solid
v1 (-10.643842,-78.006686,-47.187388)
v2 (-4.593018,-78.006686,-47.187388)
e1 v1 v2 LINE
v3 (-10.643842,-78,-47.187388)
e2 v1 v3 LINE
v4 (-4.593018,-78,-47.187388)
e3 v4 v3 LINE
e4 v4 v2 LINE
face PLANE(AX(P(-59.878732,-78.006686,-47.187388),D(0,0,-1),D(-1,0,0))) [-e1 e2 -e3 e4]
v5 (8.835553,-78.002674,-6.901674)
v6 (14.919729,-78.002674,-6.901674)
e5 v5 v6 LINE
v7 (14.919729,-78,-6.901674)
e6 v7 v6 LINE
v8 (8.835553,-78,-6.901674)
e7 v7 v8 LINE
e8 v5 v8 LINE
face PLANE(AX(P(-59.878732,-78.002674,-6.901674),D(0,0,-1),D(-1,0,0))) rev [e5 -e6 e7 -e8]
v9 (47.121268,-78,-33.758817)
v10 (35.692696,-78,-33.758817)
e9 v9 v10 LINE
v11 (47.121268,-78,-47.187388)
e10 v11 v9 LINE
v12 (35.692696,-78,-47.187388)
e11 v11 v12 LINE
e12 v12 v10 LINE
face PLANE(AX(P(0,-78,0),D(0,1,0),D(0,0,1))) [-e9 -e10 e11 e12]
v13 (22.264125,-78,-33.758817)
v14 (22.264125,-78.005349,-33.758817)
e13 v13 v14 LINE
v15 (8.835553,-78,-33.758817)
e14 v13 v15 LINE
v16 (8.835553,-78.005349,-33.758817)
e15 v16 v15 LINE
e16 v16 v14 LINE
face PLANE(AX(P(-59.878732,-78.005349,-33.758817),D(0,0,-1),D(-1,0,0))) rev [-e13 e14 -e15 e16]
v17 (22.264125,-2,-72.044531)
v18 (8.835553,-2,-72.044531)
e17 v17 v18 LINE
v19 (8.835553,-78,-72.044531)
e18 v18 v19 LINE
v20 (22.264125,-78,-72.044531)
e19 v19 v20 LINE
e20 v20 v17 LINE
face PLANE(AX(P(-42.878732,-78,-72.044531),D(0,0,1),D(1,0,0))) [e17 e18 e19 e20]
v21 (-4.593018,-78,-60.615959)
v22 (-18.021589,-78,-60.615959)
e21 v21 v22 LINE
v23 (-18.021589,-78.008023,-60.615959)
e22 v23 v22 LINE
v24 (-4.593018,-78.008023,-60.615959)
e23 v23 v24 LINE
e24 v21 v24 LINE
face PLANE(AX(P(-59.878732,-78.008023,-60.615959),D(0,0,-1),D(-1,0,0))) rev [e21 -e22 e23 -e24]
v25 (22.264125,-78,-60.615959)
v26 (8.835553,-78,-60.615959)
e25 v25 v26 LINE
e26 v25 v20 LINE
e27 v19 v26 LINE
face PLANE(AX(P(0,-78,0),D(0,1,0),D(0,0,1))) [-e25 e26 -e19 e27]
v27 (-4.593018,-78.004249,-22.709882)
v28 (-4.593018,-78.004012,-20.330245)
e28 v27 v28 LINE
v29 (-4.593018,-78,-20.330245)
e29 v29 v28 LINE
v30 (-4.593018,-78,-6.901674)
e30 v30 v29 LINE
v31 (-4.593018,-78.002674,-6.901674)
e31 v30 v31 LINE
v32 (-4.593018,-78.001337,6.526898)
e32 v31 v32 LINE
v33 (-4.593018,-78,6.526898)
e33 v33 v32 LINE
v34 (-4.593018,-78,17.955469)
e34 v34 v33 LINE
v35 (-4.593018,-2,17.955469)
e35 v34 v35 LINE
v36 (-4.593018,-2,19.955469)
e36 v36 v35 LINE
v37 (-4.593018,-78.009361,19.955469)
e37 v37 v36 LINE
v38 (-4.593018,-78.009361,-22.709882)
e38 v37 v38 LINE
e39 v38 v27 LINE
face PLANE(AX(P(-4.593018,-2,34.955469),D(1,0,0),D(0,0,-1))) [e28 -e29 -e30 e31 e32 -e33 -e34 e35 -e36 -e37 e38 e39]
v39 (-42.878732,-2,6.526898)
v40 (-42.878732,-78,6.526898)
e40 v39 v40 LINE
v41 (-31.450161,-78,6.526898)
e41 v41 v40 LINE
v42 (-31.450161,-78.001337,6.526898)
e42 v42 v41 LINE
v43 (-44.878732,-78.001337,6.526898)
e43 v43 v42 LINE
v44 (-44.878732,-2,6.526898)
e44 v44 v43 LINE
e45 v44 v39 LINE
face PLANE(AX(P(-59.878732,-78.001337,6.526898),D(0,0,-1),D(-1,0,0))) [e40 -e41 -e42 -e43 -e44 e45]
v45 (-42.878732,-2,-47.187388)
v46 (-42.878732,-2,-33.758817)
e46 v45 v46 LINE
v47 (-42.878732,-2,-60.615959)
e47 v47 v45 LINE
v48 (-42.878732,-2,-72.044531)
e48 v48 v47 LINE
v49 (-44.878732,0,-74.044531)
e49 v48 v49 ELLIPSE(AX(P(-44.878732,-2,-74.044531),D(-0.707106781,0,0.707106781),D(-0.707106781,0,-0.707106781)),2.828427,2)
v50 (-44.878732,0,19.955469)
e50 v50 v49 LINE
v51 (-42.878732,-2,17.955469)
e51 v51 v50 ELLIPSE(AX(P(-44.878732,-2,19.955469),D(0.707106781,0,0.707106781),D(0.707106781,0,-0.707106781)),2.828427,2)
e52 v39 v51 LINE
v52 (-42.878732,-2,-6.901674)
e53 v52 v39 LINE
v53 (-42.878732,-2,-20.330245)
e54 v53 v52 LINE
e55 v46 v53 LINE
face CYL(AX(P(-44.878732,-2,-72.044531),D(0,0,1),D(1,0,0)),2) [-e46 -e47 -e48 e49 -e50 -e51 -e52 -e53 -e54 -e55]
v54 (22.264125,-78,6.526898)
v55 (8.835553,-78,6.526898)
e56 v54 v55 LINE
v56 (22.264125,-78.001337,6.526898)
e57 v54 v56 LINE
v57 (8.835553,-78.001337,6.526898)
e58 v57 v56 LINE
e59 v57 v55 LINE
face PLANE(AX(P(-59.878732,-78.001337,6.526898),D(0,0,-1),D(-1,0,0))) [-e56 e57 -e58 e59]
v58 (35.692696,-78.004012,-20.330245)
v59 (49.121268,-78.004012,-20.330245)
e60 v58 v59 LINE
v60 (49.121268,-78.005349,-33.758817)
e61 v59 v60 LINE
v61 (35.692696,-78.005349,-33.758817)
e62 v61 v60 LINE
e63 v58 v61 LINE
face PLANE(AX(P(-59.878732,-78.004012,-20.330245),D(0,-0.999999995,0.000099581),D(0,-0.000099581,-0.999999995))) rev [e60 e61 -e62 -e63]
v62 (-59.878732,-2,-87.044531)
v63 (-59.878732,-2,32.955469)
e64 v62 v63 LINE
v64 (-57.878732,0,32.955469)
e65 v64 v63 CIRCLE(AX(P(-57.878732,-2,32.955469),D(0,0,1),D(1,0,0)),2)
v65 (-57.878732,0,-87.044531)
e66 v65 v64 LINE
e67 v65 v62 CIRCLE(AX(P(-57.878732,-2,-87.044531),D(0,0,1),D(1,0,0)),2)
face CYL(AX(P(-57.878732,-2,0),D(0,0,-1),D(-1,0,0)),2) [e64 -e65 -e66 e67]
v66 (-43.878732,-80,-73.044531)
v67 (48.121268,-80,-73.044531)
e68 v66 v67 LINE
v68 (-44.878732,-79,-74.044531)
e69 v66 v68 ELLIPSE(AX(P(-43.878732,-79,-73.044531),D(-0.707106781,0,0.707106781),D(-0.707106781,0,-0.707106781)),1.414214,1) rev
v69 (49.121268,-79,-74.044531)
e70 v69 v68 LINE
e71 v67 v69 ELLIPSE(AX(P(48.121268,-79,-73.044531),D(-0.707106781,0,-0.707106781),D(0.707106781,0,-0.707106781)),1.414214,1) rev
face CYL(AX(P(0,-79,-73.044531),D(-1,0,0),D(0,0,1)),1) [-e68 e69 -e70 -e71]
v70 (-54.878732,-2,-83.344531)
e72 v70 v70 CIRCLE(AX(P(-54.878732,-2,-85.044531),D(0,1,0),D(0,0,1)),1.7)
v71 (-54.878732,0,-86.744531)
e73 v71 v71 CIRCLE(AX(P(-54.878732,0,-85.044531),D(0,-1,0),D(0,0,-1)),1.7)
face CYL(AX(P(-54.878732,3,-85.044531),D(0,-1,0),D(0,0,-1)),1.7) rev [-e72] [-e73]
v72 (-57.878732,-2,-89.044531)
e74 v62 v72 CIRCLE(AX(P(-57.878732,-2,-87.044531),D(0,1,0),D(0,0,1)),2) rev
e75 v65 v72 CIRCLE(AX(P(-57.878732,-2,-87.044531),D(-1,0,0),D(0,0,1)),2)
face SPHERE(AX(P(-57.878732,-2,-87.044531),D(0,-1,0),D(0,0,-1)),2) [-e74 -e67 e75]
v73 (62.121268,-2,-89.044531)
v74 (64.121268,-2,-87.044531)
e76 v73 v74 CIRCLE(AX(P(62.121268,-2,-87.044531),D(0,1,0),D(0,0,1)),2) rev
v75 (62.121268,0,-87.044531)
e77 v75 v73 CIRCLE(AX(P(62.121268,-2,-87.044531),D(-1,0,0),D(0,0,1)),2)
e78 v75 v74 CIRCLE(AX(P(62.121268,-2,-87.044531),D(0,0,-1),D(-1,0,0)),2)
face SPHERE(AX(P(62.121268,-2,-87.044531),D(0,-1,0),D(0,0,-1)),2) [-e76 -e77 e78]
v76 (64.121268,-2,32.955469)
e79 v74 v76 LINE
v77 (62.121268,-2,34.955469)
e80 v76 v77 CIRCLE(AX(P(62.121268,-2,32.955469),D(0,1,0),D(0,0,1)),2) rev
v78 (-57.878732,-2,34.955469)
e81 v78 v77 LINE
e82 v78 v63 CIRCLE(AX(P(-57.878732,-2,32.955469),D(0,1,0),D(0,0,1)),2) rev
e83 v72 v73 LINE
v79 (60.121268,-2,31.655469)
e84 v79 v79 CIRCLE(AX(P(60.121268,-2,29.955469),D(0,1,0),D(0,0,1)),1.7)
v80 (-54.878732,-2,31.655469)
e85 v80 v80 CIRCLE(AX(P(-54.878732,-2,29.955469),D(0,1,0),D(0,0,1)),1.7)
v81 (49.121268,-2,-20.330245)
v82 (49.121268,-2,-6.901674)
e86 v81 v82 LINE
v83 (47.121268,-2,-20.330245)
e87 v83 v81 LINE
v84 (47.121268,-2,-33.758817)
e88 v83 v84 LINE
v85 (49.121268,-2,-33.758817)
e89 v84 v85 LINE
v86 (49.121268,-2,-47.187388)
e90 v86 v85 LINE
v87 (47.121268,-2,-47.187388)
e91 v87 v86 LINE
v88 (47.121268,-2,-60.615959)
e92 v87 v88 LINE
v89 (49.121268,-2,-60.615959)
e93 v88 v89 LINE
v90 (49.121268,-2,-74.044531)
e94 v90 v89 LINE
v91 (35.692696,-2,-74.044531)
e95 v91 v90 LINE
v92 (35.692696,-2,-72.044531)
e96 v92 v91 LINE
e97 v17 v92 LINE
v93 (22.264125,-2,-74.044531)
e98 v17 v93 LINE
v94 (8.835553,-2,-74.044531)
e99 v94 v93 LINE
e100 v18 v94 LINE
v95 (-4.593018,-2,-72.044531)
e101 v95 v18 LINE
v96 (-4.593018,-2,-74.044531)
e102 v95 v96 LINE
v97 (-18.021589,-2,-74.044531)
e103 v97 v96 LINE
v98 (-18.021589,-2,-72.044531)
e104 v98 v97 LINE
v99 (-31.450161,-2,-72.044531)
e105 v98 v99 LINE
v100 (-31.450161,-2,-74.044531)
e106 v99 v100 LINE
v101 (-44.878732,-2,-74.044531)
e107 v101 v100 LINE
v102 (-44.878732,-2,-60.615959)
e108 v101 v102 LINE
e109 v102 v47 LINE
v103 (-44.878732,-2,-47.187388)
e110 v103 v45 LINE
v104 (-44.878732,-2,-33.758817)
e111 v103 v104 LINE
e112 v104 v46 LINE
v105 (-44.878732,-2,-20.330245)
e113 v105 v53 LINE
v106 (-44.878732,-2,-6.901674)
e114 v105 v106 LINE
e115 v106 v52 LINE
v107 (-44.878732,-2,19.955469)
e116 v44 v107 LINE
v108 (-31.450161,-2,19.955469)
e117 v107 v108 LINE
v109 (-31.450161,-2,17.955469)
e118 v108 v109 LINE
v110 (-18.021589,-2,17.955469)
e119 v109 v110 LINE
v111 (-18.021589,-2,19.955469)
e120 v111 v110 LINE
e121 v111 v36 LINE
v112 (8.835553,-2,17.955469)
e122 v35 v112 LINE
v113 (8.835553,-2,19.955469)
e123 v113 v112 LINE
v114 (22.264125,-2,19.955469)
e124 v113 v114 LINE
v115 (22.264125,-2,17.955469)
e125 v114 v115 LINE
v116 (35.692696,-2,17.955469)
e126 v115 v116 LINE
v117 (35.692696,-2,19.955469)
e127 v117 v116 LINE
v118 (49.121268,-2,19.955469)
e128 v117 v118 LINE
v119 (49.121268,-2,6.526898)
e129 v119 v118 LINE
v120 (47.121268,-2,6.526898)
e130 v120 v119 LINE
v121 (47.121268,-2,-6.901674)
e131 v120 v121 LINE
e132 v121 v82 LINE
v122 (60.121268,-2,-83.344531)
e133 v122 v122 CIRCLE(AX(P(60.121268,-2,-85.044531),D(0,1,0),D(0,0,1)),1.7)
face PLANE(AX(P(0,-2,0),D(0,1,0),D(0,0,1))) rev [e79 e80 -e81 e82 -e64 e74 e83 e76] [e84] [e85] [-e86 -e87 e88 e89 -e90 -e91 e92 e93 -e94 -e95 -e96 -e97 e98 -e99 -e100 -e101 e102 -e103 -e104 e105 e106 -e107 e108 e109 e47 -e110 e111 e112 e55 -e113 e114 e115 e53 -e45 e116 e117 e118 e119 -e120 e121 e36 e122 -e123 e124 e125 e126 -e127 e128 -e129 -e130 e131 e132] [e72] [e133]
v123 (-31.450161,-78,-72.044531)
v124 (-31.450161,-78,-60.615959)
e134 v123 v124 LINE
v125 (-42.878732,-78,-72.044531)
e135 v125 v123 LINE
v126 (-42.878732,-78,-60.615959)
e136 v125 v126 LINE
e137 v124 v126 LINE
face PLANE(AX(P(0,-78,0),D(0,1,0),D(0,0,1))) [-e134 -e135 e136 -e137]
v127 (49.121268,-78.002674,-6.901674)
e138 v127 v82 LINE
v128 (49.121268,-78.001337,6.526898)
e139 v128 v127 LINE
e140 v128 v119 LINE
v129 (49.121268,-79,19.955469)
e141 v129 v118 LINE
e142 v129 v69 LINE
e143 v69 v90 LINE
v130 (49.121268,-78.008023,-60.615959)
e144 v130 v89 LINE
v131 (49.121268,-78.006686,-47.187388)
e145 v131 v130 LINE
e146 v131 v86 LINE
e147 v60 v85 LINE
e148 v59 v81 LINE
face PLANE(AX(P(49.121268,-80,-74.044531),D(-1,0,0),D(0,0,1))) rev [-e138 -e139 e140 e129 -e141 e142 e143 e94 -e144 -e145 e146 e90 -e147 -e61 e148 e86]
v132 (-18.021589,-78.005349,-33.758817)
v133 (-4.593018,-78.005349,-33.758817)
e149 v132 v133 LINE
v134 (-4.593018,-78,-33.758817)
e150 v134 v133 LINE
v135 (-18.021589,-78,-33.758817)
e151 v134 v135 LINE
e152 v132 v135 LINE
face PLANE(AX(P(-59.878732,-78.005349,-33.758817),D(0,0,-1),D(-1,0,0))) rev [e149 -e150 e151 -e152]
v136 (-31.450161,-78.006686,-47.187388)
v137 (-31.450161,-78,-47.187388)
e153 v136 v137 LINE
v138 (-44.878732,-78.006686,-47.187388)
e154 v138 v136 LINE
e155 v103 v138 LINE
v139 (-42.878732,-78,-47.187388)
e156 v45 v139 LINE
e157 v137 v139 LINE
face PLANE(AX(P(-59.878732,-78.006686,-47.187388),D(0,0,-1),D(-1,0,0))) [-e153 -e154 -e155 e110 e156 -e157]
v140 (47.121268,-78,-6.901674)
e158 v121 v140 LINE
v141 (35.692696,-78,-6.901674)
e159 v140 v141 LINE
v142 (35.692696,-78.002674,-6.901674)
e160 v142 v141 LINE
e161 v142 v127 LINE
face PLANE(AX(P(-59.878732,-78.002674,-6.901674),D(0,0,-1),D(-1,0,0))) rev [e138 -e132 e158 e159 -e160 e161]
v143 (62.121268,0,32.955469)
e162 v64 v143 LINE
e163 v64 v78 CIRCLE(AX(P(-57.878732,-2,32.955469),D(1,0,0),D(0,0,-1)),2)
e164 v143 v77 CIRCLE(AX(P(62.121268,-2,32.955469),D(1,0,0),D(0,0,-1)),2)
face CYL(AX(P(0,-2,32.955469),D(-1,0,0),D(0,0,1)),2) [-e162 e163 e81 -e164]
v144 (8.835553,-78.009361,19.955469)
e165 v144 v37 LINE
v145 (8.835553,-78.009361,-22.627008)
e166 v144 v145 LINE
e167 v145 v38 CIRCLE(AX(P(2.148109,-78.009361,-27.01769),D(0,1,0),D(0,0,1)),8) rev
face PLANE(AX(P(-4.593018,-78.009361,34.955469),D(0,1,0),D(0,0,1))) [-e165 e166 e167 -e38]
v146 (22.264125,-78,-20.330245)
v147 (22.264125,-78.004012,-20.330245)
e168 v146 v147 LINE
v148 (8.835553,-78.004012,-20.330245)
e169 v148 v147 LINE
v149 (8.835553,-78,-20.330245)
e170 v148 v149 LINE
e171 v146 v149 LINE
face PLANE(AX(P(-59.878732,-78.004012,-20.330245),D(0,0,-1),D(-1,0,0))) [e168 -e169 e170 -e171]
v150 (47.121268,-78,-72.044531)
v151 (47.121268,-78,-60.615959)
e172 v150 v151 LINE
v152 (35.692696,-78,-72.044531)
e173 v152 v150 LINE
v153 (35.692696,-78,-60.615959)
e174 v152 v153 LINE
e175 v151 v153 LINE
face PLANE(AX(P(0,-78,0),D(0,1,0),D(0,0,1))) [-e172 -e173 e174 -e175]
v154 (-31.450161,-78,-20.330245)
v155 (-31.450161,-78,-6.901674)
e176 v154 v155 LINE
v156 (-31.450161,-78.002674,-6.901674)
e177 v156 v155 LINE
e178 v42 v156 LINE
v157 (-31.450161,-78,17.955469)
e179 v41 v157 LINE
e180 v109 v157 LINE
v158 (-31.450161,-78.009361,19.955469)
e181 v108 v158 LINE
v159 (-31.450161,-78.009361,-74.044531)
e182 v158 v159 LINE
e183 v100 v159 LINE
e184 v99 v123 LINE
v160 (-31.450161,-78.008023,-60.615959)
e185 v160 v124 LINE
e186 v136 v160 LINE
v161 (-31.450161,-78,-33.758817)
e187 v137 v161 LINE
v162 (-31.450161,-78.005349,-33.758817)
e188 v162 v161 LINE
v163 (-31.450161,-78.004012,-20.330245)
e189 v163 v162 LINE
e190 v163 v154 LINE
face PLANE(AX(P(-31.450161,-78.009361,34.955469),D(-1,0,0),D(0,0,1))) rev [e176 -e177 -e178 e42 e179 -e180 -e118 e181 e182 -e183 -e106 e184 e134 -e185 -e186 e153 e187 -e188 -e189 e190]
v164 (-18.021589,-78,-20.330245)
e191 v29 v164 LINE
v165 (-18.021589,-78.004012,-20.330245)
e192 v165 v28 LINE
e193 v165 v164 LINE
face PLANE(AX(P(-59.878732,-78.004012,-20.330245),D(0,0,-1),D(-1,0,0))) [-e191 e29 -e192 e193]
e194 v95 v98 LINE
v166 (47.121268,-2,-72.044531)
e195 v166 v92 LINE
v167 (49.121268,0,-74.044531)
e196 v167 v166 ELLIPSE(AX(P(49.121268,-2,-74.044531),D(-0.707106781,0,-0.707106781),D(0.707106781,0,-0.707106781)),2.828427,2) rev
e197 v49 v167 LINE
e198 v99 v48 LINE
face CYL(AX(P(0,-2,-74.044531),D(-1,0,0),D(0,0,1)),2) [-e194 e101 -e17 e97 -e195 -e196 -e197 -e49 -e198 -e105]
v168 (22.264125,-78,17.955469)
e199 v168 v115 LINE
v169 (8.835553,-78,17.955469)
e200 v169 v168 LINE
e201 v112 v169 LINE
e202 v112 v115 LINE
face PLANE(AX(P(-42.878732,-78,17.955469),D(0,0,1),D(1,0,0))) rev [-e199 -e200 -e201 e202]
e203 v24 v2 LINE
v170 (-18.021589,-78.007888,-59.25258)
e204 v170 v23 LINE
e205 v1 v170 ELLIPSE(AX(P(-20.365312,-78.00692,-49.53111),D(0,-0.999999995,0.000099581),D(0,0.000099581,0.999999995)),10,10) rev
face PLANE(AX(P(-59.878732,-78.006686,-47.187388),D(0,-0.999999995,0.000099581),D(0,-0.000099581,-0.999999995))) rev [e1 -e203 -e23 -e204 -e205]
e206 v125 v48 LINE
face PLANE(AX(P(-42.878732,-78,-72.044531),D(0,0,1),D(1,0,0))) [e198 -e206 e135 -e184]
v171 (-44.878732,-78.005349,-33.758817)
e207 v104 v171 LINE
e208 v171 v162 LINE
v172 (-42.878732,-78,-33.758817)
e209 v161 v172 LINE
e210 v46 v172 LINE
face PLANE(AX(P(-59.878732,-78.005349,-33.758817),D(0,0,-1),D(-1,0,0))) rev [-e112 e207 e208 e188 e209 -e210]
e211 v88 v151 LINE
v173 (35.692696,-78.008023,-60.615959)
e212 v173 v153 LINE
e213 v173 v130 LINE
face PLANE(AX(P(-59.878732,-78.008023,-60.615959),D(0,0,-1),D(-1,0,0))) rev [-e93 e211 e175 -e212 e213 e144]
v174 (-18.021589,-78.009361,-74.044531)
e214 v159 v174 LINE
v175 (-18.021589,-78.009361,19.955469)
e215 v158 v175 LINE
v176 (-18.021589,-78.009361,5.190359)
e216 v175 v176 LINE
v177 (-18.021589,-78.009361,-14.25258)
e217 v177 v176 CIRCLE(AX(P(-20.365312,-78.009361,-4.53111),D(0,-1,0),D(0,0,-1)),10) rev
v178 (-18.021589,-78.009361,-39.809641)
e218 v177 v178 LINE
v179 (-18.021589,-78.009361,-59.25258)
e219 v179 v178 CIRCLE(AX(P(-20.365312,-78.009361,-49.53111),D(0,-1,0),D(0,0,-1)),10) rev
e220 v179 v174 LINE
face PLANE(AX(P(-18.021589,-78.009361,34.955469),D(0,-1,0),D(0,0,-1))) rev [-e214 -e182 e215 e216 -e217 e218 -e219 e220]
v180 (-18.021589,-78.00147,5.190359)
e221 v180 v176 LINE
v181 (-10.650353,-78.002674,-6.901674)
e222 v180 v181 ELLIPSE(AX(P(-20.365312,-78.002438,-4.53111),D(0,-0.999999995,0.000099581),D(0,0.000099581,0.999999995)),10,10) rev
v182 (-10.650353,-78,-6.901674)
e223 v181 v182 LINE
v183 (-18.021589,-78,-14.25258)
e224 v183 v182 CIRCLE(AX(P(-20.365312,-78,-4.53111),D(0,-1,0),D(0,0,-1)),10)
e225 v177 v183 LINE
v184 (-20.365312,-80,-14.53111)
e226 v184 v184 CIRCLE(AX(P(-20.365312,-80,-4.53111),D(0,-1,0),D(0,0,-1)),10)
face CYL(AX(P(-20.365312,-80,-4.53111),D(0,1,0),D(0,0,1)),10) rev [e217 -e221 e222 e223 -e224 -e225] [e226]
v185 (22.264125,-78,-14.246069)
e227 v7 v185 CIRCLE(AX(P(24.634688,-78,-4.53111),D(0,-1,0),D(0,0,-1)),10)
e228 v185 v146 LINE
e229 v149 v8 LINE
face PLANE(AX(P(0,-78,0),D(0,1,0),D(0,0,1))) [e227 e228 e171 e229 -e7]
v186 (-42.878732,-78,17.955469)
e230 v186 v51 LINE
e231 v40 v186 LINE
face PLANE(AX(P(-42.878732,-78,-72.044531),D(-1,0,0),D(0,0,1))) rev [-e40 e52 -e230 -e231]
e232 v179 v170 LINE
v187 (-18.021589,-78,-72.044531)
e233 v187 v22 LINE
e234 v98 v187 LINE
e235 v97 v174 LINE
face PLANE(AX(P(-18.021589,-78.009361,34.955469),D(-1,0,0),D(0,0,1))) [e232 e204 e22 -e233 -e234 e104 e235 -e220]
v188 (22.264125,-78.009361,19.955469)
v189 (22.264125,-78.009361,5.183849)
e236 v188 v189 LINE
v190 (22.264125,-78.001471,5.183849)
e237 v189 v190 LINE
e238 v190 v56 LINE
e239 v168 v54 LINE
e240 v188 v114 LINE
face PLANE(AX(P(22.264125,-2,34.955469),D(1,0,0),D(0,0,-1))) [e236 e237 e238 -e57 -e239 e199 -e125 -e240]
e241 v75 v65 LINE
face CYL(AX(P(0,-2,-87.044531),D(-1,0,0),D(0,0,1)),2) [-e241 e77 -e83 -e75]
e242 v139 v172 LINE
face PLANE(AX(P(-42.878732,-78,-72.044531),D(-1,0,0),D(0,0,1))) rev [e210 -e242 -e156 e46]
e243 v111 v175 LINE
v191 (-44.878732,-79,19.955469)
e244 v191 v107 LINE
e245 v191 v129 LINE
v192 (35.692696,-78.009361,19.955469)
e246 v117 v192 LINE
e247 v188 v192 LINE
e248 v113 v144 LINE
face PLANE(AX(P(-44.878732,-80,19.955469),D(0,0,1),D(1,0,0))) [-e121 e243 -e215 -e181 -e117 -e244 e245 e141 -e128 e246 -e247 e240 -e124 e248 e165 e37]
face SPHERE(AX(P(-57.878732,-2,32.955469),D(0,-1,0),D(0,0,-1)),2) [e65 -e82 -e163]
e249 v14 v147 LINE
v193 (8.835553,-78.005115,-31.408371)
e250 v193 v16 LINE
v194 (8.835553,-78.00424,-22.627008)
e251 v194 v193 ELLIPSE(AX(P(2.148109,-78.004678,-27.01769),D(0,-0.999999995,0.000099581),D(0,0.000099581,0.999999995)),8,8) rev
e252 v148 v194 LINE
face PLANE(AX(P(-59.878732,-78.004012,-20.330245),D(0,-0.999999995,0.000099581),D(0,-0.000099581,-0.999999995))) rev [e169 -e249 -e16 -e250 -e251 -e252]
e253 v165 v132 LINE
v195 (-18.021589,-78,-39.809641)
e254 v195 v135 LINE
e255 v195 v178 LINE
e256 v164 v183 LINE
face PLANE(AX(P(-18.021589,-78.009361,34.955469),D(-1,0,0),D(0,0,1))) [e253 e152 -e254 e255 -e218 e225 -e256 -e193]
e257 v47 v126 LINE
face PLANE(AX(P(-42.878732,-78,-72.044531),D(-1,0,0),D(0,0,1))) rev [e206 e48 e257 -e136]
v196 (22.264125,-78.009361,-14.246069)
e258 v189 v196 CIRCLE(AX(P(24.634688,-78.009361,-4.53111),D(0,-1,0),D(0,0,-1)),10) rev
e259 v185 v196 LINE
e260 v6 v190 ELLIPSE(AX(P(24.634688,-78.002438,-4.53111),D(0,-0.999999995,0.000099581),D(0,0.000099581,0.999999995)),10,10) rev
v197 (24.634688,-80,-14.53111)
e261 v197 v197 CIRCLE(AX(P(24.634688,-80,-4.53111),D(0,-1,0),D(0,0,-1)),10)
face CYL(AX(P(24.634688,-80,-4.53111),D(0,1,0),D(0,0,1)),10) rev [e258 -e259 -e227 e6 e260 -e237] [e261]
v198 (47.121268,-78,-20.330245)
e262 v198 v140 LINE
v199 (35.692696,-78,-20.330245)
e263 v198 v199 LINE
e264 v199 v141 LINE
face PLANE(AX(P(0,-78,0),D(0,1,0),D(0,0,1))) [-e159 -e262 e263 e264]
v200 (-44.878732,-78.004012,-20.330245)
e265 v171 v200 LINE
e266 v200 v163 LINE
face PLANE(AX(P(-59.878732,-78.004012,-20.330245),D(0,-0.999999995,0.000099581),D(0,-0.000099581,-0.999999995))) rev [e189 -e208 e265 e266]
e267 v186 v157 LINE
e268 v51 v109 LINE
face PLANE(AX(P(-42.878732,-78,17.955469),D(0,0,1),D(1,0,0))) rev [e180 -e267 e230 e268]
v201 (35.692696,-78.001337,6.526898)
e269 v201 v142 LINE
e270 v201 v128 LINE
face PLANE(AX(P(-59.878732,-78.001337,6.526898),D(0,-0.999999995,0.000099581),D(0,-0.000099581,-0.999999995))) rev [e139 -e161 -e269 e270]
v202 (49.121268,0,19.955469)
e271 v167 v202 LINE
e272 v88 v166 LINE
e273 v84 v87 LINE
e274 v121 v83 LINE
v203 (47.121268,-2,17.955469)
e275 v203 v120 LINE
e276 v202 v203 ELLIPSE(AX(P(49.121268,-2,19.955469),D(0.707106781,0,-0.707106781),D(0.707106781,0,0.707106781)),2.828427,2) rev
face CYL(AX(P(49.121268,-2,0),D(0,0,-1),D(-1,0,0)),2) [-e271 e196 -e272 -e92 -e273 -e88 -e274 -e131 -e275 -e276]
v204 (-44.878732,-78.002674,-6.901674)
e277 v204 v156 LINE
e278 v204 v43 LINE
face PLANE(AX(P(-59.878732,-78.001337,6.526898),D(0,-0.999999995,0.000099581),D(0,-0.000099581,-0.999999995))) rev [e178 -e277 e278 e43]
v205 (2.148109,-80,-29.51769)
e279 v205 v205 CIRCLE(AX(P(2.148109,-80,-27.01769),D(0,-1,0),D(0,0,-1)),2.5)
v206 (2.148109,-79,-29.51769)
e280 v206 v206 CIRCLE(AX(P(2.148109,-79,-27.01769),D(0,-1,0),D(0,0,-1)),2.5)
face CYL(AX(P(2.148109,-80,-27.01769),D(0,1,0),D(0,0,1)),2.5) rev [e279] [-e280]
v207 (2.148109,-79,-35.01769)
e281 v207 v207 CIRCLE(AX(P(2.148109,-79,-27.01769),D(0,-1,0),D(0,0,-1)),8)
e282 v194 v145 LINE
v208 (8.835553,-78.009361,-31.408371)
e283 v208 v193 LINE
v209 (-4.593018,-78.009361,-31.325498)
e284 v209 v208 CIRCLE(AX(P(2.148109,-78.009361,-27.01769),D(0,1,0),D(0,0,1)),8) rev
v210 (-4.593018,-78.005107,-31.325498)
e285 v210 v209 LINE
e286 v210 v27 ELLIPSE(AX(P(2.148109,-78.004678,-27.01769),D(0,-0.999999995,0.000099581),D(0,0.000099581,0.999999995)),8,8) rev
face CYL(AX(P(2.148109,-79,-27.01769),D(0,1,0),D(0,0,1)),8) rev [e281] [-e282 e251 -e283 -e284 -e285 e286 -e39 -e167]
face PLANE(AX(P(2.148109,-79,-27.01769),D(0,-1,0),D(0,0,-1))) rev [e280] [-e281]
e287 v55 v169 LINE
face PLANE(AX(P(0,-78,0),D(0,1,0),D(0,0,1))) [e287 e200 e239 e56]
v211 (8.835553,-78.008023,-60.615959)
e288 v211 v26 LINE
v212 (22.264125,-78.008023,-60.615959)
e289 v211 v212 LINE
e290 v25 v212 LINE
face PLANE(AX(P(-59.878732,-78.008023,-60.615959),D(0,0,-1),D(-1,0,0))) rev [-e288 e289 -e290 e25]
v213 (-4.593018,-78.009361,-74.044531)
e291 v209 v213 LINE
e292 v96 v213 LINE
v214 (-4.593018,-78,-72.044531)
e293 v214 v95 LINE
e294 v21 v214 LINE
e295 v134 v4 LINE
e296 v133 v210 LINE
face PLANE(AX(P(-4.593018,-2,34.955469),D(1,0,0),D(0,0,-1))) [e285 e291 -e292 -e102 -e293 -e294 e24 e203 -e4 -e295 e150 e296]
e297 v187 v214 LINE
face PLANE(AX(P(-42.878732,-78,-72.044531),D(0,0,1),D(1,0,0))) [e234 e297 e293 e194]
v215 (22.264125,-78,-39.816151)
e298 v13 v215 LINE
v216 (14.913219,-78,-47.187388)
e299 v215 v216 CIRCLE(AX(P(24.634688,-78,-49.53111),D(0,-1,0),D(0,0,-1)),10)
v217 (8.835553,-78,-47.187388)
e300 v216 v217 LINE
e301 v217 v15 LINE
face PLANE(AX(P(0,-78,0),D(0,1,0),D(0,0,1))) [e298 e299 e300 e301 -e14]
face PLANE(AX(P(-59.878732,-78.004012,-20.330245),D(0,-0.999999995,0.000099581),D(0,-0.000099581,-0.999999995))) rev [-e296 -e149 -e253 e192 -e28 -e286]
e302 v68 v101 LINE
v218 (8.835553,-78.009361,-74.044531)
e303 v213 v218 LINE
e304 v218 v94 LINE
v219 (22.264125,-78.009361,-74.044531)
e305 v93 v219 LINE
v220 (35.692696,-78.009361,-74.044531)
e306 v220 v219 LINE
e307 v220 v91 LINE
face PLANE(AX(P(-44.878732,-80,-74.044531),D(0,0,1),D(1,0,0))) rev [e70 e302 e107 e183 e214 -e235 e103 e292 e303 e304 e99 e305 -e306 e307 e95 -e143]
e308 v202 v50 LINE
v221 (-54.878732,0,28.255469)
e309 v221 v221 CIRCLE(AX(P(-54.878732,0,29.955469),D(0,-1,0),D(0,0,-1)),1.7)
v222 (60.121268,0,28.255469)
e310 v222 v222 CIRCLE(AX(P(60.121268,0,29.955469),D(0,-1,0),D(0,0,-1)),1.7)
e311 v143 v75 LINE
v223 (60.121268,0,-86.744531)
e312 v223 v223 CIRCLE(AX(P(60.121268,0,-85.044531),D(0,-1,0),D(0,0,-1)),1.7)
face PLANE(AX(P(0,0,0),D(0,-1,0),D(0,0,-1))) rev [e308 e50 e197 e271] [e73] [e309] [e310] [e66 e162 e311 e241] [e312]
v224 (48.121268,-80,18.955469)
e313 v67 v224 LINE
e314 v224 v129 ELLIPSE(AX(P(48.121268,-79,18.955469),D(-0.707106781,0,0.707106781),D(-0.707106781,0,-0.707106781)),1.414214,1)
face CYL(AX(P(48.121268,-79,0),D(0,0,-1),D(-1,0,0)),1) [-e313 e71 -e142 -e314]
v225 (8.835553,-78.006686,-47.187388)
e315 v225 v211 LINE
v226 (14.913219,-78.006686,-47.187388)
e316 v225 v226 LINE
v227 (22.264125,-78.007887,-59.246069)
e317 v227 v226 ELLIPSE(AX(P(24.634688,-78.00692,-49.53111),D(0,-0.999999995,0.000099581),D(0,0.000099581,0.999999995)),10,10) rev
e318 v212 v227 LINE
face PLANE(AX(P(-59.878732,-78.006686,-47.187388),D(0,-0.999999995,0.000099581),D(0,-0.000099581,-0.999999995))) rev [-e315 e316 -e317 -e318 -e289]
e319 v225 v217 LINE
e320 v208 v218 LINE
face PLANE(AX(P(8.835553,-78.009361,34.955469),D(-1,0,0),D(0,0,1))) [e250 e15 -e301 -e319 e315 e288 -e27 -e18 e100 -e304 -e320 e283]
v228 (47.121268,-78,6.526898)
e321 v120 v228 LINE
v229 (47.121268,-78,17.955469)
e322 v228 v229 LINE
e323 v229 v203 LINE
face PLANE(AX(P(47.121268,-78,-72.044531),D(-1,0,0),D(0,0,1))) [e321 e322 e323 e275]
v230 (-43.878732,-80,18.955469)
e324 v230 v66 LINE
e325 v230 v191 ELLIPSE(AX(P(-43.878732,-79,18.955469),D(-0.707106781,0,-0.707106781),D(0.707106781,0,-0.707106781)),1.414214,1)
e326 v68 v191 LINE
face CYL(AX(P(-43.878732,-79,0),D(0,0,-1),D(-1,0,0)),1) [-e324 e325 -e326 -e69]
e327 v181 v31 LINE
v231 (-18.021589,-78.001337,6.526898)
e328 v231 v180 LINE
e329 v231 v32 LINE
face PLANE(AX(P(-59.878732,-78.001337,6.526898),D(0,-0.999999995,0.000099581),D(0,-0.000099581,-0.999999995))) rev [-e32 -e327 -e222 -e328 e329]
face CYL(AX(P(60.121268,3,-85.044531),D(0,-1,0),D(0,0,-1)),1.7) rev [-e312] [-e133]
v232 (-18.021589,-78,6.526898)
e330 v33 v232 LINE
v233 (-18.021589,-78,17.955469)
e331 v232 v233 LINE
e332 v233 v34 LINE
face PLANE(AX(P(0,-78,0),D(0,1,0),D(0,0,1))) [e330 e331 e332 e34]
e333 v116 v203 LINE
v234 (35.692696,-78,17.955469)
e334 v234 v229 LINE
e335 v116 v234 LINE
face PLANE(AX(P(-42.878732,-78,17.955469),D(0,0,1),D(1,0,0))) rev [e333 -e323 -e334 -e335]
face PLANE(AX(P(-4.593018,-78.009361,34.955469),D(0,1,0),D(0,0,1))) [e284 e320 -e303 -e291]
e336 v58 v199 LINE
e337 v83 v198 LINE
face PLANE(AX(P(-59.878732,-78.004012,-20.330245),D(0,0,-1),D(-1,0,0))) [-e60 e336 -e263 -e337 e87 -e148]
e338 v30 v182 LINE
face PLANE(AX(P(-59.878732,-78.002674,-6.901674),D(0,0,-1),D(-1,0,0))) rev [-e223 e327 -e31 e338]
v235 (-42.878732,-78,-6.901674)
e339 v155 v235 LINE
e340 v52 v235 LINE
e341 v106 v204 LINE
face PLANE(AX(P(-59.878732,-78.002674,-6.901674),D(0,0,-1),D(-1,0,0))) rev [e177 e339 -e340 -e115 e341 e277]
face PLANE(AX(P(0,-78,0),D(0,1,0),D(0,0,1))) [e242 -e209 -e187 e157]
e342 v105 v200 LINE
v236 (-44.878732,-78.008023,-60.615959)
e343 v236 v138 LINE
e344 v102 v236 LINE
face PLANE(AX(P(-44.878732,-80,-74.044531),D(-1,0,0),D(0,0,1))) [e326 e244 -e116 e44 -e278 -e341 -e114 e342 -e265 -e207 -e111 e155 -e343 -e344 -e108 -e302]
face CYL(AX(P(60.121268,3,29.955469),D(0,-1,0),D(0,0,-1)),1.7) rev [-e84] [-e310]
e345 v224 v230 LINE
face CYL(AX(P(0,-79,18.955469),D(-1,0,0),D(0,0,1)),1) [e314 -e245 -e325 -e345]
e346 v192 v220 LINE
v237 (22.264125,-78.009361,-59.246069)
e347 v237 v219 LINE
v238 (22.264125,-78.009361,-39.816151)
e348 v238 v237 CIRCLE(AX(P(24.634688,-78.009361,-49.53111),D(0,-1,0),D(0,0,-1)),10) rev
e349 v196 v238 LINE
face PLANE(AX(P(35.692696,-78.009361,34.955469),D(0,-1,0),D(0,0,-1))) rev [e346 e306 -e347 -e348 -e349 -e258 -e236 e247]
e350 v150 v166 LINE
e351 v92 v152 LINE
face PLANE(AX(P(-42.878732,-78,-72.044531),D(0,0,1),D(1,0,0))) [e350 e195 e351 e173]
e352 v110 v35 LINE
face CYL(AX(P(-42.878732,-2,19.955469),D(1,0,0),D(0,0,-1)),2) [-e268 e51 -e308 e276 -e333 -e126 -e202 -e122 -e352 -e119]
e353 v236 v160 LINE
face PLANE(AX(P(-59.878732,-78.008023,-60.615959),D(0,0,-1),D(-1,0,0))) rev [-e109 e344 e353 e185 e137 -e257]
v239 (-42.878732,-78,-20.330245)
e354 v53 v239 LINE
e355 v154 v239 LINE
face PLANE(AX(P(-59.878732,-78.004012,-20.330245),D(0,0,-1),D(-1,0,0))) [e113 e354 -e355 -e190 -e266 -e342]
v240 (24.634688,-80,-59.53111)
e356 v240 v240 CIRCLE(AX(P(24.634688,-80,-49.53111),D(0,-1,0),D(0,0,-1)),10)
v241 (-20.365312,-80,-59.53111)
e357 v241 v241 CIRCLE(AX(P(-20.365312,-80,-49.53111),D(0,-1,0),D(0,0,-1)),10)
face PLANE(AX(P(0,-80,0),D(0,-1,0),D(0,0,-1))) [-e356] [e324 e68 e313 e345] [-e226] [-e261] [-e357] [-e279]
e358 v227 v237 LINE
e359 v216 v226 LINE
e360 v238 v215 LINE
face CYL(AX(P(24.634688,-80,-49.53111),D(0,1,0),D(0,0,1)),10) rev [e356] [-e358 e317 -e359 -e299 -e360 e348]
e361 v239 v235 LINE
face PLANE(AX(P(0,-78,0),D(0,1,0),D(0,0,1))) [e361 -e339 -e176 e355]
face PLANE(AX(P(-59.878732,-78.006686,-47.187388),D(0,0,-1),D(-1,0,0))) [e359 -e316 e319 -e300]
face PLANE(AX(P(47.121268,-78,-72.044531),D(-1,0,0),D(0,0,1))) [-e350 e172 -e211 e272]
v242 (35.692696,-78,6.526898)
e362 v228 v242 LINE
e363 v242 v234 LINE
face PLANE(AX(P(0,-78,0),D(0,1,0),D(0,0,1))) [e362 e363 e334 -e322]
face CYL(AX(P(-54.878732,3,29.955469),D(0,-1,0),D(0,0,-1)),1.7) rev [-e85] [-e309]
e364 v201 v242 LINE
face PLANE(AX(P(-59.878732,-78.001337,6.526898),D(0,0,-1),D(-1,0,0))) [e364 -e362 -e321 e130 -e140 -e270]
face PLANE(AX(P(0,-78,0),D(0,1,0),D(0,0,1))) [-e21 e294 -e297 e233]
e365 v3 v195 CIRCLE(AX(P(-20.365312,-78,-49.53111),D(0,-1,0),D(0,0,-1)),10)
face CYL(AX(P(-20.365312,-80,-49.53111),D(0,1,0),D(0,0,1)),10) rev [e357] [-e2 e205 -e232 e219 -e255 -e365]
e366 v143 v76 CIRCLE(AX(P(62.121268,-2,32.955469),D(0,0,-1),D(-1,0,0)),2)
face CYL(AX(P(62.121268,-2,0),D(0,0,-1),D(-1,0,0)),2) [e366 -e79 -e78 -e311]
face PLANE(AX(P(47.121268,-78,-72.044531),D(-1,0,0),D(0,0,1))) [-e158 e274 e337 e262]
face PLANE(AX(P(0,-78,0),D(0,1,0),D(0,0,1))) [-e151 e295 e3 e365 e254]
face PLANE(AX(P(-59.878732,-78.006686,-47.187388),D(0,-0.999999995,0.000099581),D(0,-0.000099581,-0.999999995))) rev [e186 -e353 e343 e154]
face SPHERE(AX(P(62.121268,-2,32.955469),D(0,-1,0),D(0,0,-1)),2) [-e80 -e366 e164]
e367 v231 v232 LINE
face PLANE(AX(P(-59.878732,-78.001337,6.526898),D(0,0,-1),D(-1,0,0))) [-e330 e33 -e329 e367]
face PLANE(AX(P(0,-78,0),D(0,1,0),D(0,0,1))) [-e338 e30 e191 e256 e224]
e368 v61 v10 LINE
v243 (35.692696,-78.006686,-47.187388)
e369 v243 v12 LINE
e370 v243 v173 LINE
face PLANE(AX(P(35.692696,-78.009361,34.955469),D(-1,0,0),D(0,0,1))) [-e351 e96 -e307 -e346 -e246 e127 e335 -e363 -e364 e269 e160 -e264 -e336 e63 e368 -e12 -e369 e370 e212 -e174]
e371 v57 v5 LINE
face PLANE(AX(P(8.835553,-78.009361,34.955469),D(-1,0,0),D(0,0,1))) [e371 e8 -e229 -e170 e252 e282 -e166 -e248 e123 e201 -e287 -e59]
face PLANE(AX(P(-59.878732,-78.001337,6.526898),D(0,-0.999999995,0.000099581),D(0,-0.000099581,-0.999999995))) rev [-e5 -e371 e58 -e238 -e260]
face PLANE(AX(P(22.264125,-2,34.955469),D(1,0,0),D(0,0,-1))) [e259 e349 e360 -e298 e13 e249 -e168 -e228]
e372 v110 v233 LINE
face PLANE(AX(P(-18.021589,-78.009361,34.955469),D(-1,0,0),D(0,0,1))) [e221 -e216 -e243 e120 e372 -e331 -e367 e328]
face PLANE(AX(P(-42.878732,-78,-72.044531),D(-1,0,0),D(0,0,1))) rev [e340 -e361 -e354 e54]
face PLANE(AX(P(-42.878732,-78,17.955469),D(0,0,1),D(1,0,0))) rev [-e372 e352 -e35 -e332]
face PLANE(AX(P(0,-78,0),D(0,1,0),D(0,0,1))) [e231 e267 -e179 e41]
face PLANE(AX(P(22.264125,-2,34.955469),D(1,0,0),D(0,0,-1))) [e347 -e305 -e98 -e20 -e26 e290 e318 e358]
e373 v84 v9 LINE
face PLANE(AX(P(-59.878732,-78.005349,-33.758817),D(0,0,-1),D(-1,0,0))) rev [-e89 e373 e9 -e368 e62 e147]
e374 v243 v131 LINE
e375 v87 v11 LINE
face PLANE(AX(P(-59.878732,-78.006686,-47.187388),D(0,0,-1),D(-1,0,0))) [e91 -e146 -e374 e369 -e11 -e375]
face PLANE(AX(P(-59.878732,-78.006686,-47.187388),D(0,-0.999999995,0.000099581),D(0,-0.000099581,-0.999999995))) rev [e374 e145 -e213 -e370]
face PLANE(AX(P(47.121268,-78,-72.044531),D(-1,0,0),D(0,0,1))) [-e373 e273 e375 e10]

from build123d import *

# Parameters (mm, degrees)
SKETCH_1_W               = 94
SKETCH_1_H               = 94
EXTRUDE_1_DEPTH          = 80
SKETCH_1_3_W             = 90
SKETCH_1_3_H             = 90
CUT_EXTRUDE_1_DEPTH      = 78
SKETCH_1_5_W             = 124
SKETCH_1_5_H             = 124
SKETCH_1_5_W_2           = 94
SKETCH_1_5_H_2           = 94
EXTRUDE_2_DEPTH          = 2
FILLET_1_R               = 2
CUT_EXTRUDE_4_DEPTH      = 162.89480683
CUT_EXTRUDE_5_DEPTH      = 162.89480683
CUT_EXTRUDE_6_DEPTH      = 162.89480683
SKETCH_6_W               = 13.428571429
SKETCH_6_H               = 76.0093606
CUT_EXTRUDE_7_DEPTH      = 150.641361191
SKETCH_6_3_W             = 13.428571429
SKETCH_6_3_H             = 76.0093606
CUT_EXTRUDE_8_DEPTH      = 150.641361191
CUT_EXTRUDE_9_DEPTH      = 150.641361191
CUT_EXTRUDE_9_DEPTH_BACK = 150.641361191
SKETCH_6_4_W             = 13.428571428
SKETCH_6_4_H             = 76.0093606
SKETCH_8_R               = 2.5
CUT_EXTRUDE_13_DEPTH     = 135.627134923
SKETCH_8_4_R             = 8
CUT_EXTRUDE_16_DEPTH     = 1
SKETCH_8_5_R             = 10
CUT_EXTRUDE_17_DEPTH     = 135.627134923
FILLET_2_R               = 2
FILLET_4_R               = 2
FILLET_10_R              = 1
SKETCH_10_R              = 1.7
CUT_EXTRUDE_18_DEPTH     = 10


with BuildPart() as part:
    # 草图1 → 凸台-拉伸1 (new body)
    with BuildSketch(Plane(origin=(0, 0, 0), x_dir=(1, 0, 0), z_dir=(0, 1, 0))):
        with Locations((2.121267759, 27.044530874)):
            Rectangle(SKETCH_1_W, SKETCH_1_H)
    extrude(amount=-EXTRUDE_1_DEPTH)

    # 草图1<3> → 切除-拉伸1 (cut)
    with BuildSketch(Plane(origin=(0, 0, 0), x_dir=(1, 0, 0), z_dir=(0, 1, 0))):
        with Locations((2.121267759, 27.044530874)):
            Rectangle(SKETCH_1_3_W, SKETCH_1_3_H)
    extrude(amount=-CUT_EXTRUDE_1_DEPTH, mode=Mode.SUBTRACT)

    # 草图1<5> → 凸台-拉伸2 (add)
    with BuildSketch(Plane(origin=(0, 0, 0), x_dir=(1, 0, 0), z_dir=(0, 1, 0))):
        with Locations((2.121267759, 27.044530874)):
            Rectangle(SKETCH_1_5_W, SKETCH_1_5_H)
        with Locations((2.121267759, 27.044530874)):
            Rectangle(SKETCH_1_5_W_2, SKETCH_1_5_H_2, mode=Mode.SUBTRACT)
    extrude(amount=-EXTRUDE_2_DEPTH)

    # 圆角1
    fillet_1_edges = [part.edges().sort_by_distance(p)[0] for p in [
        (2.121267759, 0, -72.044530874),
        (47.121267759, 0, -27.044530874),
        (-42.878732241, 0, -27.044530874),
        (2.121267759, 0, 17.955469126),
    ]]
    fillet(fillet_1_edges, radius=FILLET_1_R)

    # 草图5 → 切除-拉伸4 (cut, through all)
    with BuildSketch(Plane(origin=(49.121267759, 0, 0), x_dir=(0, 0, -1), z_dir=(1, 0, 0))):
        Polygon((-6.526897697, -78.001337229), (-6.526897697, -2), (6.901673731, -2), (6.901673731, -78.002674457), align=None)
    extrude(amount=-CUT_EXTRUDE_4_DEPTH, mode=Mode.SUBTRACT)

    # 草图5<5> → 切除-拉伸5 (cut, through all)
    with BuildSketch(Plane(origin=(49.121267759, 0, 0), x_dir=(0, 0, -1), z_dir=(1, 0, 0))):
        Polygon((20.33024516, -78.004011686), (20.33024516, -2), (33.758816589, -2), (33.758816589, -78.005348914), align=None)
    extrude(amount=-CUT_EXTRUDE_5_DEPTH, mode=Mode.SUBTRACT)

    # 草图5<6> → 切除-拉伸6 (cut, through all)
    with BuildSketch(Plane(origin=(49.121267759, 0, 0), x_dir=(0, 0, -1), z_dir=(1, 0, 0))):
        Polygon((47.187388017, -78.006686143), (47.187388017, -2), (60.615959446, -2), (60.615959446, -78.008023372), align=None)
    extrude(amount=-CUT_EXTRUDE_6_DEPTH, mode=Mode.SUBTRACT)

    # 草图6 → 切除-拉伸7 (cut, through all)
    with BuildSketch(Plane(origin=(0, 0, -74.044530874), x_dir=(-1, 0, 0), z_dir=(0, 0, -1))):
        with Locations((-28.978410616, -40.0046803)):
            Rectangle(SKETCH_6_W, SKETCH_6_H)
    extrude(amount=-CUT_EXTRUDE_7_DEPTH, mode=Mode.SUBTRACT)

    # 草图6<3> → 切除-拉伸8 (cut, through all)
    with BuildSketch(Plane(origin=(0, 0, -74.044530874), x_dir=(-1, 0, 0), z_dir=(0, 0, -1))):
        with Locations((-2.12126776, -40.0046803)):
            Rectangle(SKETCH_6_3_W, SKETCH_6_3_H)
    extrude(amount=-CUT_EXTRUDE_8_DEPTH, mode=Mode.SUBTRACT)

    # 草图6<4> → 切除-拉伸9 (cut, two sides: drawn at the far end of the back side and taken through both)
    with BuildSketch(Plane(origin=(0, 0, -74.044530874), x_dir=(-1, 0, 0), z_dir=(0, 0, -1)).offset(-CUT_EXTRUDE_9_DEPTH_BACK)):
        with Locations((24.735875098, -40.0046803)):
            Rectangle(SKETCH_6_4_W, SKETCH_6_4_H)
    extrude(amount=CUT_EXTRUDE_9_DEPTH + CUT_EXTRUDE_9_DEPTH_BACK, mode=Mode.SUBTRACT)

    # 草图8 → 切除-拉伸13 (cut, through all)
    with BuildSketch(Plane(origin=(0, -78, 0), x_dir=(-1, 0, 0), z_dir=(0, -1, 0))):
        with Locations(Location((-2.148108933, 27.017689701, 0), (0, 0, 270))):
            Circle(SKETCH_8_R)
    extrude(amount=CUT_EXTRUDE_13_DEPTH, mode=Mode.SUBTRACT)

    # 草图8<4> → 切除-拉伸16 (cut)
    with BuildSketch(Plane(origin=(0, -78, 0), x_dir=(-1, 0, 0), z_dir=(0, -1, 0))):
        with Locations(Location((-2.148108933, 27.017689701, 0), (0, 0, 213.287140052))):
            Circle(SKETCH_8_4_R)
    extrude(amount=CUT_EXTRUDE_16_DEPTH, mode=Mode.SUBTRACT)

    # 草图8<5> → 切除-拉伸17 (cut, through all)
    with BuildSketch(Plane(origin=(0, -78, 0), x_dir=(-1, 0, 0), z_dir=(0, -1, 0))):
        with Locations(Location((20.365311654, 4.531110288, 0), (0, 0, 256.445379393))):
            Circle(SKETCH_8_5_R)
        with Locations(Location((-24.634688346, 49.531110288, 0), (0, 0, 283.712868299))):
            Circle(SKETCH_8_5_R)
        with Locations(Location((-24.634688346, 4.531110288, 0), (0, 0, 283.712868299))):
            Circle(SKETCH_8_5_R)
        with Locations(Location((20.365311654, 49.531110288, 0), (0, 0, 256.445379393))):
            Circle(SKETCH_8_5_R)
    extrude(amount=CUT_EXTRUDE_17_DEPTH, mode=Mode.SUBTRACT)

    # 圆角2
    fillet_2_edges = [part.edges().sort_by_distance(p)[0] for p in [
        (-59.878732241, -1, 34.955469126),
        (-59.878732241, -1, -89.044530874),
        (64.121267759, -1, -89.044530874),
        (64.121267759, -1, 34.955469126),
    ]]
    fillet(fillet_2_edges, radius=FILLET_2_R)

    # 圆角4
    fillet_4_edges = [part.edges().sort_by_distance(p)[0] for p in [
        (2.121267759, 0, 34.955469126),
        (-59.878732241, 0, -27.044530874),
        (64.121267759, 0, -27.044530874),
        (2.121267759, 0, -89.044530874),
        (-59.292945803, 0, -88.458744437),
        (63.535481322, 0, -88.458744437),
        (-59.292945803, 0, 34.369682688),
        (63.535481322, 0, 34.369682688),
    ]]
    fillet(fillet_4_edges, radius=FILLET_4_R - 0.0001)  # a hair under: the kernel refuses the full size

    # 圆角10
    fillet_10_edges = [part.edges().sort_by_distance(p)[0] for p in [
        (2.121267759, -80, 19.955469126),
        (-44.878732241, -80, -27.044530874),
        (2.121267759, -80, -74.044530874),
        (49.121267759, -80, -27.044530874),
    ]]
    fillet(fillet_10_edges, radius=FILLET_10_R)

    # 草图10 → 切除-拉伸18 (cut)
    with BuildSketch(Plane.XZ.offset(7)):
        with Locations(Location((60.121267759, 29.955469126, 0), (0, 0, 270))):
            Circle(SKETCH_10_R)
        with Locations(Location((60.121267759, -85.044530874, 0), (0, 0, 270))):
            Circle(SKETCH_10_R)
        with Locations(Location((-54.878732241, -85.044530874, 0), (0, 0, 270))):
            Circle(SKETCH_10_R)
        with Locations(Location((-54.878732241, 29.955469126, 0), (0, 0, 270))):
            Circle(SKETCH_10_R)
    extrude(amount=-CUT_EXTRUDE_18_DEPTH, mode=Mode.SUBTRACT)


solid = part.part
